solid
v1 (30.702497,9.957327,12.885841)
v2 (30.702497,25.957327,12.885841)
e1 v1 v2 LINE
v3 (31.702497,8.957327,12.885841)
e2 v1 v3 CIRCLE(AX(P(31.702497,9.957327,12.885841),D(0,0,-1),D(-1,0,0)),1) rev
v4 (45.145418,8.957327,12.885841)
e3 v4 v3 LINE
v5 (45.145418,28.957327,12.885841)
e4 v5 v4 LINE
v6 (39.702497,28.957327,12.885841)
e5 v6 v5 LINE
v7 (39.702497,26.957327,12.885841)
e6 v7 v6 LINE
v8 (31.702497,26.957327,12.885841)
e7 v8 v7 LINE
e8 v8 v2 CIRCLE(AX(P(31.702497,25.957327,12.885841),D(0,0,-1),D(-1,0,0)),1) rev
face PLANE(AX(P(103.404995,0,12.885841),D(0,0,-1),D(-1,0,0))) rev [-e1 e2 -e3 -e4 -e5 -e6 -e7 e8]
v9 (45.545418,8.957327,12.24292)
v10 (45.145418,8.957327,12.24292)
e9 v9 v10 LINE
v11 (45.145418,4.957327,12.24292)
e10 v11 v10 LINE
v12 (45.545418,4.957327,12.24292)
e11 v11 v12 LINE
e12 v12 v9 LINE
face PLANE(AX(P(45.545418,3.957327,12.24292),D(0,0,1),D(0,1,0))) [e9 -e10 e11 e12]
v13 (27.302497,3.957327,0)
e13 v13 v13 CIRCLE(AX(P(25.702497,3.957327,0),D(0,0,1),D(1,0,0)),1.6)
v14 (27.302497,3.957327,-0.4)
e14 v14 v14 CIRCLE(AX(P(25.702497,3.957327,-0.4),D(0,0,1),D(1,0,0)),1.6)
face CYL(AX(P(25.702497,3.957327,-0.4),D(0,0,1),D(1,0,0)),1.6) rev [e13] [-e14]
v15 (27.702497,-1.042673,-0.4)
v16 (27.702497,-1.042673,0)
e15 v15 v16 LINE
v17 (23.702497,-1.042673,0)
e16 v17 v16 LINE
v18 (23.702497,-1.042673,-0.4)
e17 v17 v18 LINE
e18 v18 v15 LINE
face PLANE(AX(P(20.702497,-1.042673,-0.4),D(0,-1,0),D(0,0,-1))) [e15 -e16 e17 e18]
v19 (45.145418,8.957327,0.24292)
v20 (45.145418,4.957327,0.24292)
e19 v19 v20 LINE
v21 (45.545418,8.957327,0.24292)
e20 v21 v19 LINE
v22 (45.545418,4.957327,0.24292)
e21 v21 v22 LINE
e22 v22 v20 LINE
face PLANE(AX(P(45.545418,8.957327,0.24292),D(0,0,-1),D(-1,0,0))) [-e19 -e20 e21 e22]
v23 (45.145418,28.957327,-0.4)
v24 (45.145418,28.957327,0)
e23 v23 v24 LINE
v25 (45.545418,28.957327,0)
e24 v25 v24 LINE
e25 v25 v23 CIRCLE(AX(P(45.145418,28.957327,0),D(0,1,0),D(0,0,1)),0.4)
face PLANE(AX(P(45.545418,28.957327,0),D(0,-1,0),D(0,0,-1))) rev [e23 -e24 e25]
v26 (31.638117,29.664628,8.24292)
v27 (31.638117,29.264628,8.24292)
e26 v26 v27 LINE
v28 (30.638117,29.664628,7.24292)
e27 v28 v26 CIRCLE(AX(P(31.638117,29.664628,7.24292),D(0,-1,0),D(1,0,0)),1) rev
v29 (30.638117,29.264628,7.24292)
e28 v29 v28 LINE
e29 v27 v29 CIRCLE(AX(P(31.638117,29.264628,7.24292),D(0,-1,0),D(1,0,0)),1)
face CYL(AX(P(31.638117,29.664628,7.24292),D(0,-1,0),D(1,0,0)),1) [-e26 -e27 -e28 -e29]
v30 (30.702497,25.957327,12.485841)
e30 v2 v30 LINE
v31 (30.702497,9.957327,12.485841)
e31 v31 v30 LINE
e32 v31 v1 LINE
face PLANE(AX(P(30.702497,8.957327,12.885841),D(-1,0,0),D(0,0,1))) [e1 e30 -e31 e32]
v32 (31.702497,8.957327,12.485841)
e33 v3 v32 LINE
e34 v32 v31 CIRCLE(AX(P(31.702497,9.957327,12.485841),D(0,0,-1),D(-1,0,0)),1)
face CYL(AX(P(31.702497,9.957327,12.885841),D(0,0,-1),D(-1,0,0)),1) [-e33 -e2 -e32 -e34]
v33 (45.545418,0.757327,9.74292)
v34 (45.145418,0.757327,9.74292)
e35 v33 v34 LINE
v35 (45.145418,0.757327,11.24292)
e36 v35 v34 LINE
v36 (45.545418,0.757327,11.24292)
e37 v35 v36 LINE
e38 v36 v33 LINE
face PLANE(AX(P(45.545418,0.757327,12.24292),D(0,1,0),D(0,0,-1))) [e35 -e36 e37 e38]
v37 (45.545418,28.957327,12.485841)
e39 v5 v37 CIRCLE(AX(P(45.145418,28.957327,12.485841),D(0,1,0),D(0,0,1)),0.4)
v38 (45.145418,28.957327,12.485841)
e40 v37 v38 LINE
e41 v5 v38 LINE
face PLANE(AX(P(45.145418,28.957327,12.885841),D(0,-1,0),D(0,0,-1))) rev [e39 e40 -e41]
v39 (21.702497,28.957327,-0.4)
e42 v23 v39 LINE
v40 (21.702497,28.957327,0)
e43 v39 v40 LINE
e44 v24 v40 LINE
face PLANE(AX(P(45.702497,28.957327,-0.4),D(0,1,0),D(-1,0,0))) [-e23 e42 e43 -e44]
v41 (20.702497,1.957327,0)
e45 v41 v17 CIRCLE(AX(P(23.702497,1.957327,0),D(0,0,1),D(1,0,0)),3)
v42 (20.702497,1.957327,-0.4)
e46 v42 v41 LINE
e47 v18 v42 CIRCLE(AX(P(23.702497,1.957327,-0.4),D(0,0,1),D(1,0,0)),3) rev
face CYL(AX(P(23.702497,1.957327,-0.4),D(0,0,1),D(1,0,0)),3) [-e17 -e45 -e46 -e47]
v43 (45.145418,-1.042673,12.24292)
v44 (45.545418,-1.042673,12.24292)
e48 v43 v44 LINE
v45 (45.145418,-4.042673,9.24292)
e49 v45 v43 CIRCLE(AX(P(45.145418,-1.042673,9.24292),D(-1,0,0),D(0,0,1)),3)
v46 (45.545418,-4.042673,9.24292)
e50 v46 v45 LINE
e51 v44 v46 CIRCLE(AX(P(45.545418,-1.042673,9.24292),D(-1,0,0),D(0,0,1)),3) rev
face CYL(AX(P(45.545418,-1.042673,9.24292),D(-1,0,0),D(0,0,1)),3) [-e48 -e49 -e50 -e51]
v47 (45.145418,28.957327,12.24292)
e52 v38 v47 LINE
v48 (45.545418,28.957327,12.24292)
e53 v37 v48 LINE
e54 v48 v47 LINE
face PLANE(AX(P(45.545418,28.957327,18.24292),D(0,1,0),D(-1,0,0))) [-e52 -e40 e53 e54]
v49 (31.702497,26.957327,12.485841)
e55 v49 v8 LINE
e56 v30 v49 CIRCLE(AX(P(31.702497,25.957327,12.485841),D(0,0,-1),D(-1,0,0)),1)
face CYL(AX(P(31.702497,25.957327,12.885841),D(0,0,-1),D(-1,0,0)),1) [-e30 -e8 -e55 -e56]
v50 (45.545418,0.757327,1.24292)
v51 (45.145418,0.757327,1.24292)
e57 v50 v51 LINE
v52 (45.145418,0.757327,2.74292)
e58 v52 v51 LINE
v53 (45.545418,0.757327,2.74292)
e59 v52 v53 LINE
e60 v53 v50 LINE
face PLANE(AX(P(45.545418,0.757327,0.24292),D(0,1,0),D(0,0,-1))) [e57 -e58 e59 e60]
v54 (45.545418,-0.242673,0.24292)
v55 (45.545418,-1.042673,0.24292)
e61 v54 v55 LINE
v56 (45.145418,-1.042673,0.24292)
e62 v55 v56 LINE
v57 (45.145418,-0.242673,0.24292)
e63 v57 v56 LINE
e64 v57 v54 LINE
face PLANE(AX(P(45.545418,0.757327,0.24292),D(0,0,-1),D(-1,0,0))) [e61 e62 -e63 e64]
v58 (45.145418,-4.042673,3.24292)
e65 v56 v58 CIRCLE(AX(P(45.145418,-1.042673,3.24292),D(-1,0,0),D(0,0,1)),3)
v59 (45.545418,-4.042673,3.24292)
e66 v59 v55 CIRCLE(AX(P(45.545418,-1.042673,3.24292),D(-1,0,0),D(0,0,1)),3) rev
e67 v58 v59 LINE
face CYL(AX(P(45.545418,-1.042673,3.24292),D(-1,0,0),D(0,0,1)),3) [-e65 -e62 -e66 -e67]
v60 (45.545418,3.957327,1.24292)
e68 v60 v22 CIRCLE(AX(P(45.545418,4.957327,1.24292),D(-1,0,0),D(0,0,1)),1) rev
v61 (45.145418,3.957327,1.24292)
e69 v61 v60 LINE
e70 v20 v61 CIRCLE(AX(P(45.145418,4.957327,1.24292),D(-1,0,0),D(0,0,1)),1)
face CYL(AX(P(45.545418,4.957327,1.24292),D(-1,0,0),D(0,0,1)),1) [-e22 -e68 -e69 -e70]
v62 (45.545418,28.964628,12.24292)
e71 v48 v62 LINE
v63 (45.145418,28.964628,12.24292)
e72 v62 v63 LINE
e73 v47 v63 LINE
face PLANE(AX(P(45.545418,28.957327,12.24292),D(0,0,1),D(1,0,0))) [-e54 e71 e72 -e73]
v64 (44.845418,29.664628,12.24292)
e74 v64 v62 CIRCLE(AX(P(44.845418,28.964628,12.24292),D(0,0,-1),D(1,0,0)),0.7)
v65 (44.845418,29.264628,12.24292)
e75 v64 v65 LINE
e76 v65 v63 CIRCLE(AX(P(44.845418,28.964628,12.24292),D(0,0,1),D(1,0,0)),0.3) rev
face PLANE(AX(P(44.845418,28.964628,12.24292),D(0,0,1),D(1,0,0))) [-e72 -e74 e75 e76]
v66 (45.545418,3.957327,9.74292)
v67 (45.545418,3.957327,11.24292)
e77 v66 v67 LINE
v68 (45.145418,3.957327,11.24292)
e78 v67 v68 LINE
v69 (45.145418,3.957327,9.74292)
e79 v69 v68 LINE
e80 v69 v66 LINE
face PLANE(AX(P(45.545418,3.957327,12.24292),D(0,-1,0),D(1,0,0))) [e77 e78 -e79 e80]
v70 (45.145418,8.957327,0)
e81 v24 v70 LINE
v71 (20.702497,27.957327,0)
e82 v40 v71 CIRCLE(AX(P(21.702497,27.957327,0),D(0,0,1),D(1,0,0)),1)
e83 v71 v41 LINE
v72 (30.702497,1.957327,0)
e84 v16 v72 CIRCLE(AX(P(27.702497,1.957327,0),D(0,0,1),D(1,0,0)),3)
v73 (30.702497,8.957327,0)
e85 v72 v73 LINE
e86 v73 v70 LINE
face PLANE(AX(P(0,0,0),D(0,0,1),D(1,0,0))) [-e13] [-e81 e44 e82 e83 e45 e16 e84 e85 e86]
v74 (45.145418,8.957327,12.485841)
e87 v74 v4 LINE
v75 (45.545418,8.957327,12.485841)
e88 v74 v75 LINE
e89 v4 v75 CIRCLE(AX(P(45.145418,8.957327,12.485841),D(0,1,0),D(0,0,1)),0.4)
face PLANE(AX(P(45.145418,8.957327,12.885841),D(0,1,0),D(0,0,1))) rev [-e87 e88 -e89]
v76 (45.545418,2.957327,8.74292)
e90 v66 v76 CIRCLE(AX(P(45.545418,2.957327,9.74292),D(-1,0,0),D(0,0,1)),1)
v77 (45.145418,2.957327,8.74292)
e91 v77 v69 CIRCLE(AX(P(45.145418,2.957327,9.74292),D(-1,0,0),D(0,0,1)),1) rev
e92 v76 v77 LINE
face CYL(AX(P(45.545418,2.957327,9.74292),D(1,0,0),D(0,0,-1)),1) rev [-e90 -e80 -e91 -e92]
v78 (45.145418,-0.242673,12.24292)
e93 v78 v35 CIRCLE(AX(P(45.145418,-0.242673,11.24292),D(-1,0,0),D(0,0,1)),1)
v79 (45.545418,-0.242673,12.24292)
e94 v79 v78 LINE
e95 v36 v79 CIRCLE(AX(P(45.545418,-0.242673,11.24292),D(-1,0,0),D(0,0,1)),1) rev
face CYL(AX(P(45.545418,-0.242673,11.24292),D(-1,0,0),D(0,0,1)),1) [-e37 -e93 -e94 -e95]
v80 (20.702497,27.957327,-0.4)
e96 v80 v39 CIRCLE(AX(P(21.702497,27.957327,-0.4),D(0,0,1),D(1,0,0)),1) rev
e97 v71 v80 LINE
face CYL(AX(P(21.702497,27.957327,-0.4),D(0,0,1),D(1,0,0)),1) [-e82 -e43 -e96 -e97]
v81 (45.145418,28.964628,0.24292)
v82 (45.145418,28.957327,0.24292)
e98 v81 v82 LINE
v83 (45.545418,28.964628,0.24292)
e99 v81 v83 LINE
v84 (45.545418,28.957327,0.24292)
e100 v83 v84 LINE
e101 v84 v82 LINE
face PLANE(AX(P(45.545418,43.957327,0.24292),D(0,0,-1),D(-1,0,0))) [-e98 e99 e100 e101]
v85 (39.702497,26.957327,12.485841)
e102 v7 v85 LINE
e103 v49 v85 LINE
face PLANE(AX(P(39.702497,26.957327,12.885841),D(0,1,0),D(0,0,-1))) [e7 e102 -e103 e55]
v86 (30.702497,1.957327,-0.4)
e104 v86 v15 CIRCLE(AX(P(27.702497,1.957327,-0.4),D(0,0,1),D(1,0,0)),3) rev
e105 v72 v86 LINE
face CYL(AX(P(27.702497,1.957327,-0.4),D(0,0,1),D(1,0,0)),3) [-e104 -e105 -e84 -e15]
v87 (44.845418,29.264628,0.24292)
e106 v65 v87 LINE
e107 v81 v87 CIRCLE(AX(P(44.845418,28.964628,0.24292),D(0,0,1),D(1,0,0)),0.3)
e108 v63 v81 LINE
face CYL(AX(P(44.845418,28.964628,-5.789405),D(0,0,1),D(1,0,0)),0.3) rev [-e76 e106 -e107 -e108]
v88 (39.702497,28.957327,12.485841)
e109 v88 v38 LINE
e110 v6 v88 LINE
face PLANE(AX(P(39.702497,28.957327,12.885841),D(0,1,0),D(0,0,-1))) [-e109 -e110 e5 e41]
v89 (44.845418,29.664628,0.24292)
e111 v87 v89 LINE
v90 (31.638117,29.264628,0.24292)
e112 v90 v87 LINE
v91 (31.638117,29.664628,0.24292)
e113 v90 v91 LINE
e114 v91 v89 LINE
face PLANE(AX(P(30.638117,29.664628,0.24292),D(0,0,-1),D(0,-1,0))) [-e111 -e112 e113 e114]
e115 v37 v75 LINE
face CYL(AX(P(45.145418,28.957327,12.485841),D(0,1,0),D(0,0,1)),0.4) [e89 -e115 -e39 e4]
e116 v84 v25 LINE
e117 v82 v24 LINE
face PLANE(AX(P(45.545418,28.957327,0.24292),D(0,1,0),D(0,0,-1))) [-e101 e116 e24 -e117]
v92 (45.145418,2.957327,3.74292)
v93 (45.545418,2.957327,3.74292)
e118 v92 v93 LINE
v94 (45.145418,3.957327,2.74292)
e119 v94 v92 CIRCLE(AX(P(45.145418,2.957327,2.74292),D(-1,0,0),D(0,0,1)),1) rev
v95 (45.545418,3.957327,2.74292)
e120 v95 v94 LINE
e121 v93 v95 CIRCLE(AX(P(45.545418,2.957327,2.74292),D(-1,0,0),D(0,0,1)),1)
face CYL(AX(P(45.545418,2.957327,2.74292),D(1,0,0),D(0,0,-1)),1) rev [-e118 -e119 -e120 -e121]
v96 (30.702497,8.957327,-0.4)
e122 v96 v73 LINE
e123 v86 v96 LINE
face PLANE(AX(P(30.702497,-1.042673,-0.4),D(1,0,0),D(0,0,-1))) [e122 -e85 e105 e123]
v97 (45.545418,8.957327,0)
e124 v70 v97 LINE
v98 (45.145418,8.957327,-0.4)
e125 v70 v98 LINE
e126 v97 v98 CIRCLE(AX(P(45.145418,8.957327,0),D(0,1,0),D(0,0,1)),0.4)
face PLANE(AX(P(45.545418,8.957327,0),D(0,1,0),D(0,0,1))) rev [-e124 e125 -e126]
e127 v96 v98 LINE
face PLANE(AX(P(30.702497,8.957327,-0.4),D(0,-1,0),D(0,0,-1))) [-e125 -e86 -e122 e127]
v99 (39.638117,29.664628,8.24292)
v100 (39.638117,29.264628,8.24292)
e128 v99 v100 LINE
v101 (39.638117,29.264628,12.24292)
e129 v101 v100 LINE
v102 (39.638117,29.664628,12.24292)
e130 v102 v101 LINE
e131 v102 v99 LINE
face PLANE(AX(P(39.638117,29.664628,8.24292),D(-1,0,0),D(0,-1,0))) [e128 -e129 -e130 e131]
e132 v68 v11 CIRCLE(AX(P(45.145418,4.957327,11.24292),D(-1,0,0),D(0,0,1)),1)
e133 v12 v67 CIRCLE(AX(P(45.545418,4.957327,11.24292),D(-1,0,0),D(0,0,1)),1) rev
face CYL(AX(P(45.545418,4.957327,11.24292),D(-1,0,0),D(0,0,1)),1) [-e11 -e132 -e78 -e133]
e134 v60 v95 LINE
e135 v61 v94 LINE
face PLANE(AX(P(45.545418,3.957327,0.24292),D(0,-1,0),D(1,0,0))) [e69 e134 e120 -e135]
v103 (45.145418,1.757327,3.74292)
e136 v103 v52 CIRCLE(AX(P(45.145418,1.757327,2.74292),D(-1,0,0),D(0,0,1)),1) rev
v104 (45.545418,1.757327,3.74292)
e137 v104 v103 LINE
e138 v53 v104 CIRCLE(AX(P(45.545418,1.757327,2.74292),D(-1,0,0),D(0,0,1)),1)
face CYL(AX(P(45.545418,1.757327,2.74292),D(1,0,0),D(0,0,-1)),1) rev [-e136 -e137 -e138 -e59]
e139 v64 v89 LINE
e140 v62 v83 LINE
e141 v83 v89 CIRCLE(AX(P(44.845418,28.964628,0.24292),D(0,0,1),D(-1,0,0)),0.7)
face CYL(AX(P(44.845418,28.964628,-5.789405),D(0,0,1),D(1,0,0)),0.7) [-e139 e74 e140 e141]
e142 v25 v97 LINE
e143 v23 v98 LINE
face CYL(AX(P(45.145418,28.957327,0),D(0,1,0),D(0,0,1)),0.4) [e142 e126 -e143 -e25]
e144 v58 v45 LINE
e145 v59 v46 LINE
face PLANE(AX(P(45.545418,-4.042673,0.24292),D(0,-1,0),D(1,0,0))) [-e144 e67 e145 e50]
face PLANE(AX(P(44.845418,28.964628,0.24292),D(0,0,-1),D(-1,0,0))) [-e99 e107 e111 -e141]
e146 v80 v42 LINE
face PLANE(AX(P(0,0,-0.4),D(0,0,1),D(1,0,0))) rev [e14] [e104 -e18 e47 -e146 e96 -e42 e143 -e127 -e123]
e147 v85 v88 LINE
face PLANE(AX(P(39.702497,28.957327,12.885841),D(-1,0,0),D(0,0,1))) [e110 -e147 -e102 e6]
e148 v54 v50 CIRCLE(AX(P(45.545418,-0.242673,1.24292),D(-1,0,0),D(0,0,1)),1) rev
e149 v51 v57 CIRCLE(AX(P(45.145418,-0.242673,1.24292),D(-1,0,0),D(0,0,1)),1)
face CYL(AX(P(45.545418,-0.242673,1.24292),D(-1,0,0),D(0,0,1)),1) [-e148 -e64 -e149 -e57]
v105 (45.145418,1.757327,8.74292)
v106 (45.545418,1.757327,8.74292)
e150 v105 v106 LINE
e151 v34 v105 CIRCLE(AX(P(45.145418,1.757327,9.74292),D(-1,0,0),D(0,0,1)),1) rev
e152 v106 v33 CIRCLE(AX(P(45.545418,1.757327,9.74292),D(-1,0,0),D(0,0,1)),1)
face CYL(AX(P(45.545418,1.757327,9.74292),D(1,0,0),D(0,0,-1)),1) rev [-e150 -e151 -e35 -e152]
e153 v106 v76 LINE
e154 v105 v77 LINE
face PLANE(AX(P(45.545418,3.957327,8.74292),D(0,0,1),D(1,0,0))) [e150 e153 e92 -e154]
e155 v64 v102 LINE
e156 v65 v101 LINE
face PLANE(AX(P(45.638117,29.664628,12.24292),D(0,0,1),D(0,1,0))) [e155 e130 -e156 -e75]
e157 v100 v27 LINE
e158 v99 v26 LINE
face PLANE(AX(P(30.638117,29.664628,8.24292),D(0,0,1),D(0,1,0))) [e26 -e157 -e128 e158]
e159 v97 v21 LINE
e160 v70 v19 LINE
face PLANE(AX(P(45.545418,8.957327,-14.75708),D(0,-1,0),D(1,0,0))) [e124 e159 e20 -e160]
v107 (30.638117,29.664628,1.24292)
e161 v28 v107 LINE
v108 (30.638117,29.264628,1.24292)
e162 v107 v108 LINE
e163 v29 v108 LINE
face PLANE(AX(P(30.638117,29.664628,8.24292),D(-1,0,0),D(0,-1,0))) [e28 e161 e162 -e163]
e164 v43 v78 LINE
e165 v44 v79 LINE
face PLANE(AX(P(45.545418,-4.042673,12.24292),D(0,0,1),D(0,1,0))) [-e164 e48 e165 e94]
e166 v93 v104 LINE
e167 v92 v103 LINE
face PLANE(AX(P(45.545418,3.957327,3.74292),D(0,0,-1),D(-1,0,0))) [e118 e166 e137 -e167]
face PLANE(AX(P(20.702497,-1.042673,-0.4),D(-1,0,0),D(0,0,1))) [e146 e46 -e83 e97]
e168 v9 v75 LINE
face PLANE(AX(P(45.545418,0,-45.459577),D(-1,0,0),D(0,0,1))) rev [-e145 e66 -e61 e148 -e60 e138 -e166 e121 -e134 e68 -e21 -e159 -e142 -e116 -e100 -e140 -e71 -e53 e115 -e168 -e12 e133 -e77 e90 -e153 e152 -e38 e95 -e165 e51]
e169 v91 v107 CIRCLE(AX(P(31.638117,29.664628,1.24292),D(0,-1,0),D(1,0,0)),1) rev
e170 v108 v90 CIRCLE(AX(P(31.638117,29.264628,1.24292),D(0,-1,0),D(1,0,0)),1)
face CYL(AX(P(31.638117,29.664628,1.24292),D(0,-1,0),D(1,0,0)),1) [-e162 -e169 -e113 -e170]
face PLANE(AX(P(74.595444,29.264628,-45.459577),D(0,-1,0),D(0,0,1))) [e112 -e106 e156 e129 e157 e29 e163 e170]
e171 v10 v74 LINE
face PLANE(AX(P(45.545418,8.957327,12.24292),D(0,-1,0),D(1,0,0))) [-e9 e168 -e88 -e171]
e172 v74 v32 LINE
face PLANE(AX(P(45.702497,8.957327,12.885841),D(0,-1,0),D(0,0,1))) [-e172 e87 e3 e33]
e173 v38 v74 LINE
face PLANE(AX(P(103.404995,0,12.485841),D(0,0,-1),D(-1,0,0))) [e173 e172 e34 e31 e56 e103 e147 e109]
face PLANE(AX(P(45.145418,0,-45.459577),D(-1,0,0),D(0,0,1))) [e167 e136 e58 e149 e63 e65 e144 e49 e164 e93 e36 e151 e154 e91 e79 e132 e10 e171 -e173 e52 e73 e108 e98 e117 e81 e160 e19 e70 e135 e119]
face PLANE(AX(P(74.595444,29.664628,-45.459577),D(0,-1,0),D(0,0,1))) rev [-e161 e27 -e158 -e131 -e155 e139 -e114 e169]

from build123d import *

# Parameters (mm, degrees)
SKETCH1_R                   = 1.6
BASE_FLANGE1_DEPTH          = 0.4
SKETCHED_START              = 45.702497433
SKETCHED_BEND8_DEPTH        = 12
SKETCHED_BEND8_2_DEPTH      = 8
SKETCHED_START_2            = 53.702497433
SKETCHED_BEND8_3_DEPTH      = 4
SKETCHED_START_3            = -0.4
SKETCHED_BEND12_OUTLINE_W   = 12
SKETCHED_BEND12_OUTLINE_H   = 0.4
SKETCHED_BEND12_DEPTH       = 14.907300918
SKETCHED_START_4            = 0.242920367
SKETCHED_BEND12_2_OUTLINE_W = 0.4
SKETCHED_BEND12_2_OUTLINE_H = 4.8
SKETCHED_BEND12_2_DEPTH     = 12
SKETCHED_START_5            = 12.485840735
SKETCHED_BEND12_3_DEPTH     = 0.4
SKETCHED_BEND12_4_OUTLINE_W = 9
SKETCHED_BEND12_4_OUTLINE_H = 0.4
SKETCHED_BEND12_4_DEPTH     = 8
SKETCHED_START_6            = 3.742920367
SKETCHED_BEND12_5_OUTLINE_W = 0.4
SKETCHED_BEND12_5_OUTLINE_H = 3.2
SKETCHED_BEND12_5_DEPTH     = 5
SKETCHED_BEND12_6_OUTLINE_W = 0.4
SKETCHED_BEND12_6_OUTLINE_H = 20
SKETCHED_BEND12_6_DEPTH     = 12.485840735
SKETCHED_START_7            = -4.042672779
SKETCHED_BEND12_7_DEPTH     = 33.307300919
SKETCHED_START_8            = 8.957327221
SKETCHED_BEND12_8_DEPTH     = 20
FILLET1_R                   = 3
FILLET2_R                   = 1
FILLET3_R                   = 1


with BuildPart() as part:
    # Base-Flange1: sheet metal written as solids
    # Sketch1 → Base-Flange1 (new body)
    with BuildSketch(Plane.XY):
        Polygon((30.702497433, -1.042672779), (30.702497433, 8.957327221), (45.702497433, 8.957327221), (45.702497433, 3.957327221), (49.202497433, 3.957327221), (49.202497433, 0.757327221), (45.702497433, 0.757327221), (45.702497433, -4.042672779), (57.702497433, -4.042672779), (57.702497433, 0.757327221), (54.202497433, 0.757327221), (54.202497433, 3.957327221), (57.702497433, 3.957327221), (57.702497433, 8.957327221), (72.702497433, 8.957327221), (72.702497433, 26.957327221), (63.702497433, 26.957327221), (63.702497433, 28.957327221), (57.702497433, 28.957327221), (57.702497433, 34.957327221), (53.702497433, 34.957327221), (53.702497433, 43.957327221), (45.702497433, 43.957327221), (45.702497433, 28.957327221), (20.702497433, 28.957327221), (20.702497433, -1.042672779), align=None)
        with Locations((25.702497433, 3.957327221)):
            Circle(SKETCH1_R, mode=Mode.SUBTRACT)
    extrude(amount=-BASE_FLANGE1_DEPTH)

    # Sketched Bend8: read off the stored shape, not the designer's step
    # Sketched Bend8 outline → Sketched Bend8 (cut)
    with BuildSketch(Plane.YZ.offset(SKETCHED_START)):
        with BuildLine():
            ThreePointArc((29.597083672, 0), (29.338793878, -0.291607978), (28.96462814, -0.4))
            Line((28.96462814, -0.4), (43.957327221, -0.4))
            Line((43.957327221, -0.4), (43.957327221, 0))
            Line((43.957327221, 0), (29.597083672, 0))
        make_face()
    extrude(amount=SKETCHED_BEND8_DEPTH, mode=Mode.SUBTRACT)

    # Sketched Bend8 2 outline → Sketched Bend8 2 (add)
    with BuildSketch(Plane.YZ.offset(SKETCHED_START)):
        with BuildLine():
            Line((29.66462814, 14.507300918), (29.26462814, 14.507300918))
            Line((29.26462814, 14.507300918), (29.26462814, 0.3))
            ThreePointArc((29.26462814, 0.3), (29.176760174, 0.087867966), (28.96462814, 0))
            Line((28.96462814, 0), (29.597083672, 0))
            ThreePointArc((29.597083672, 0), (29.647533284, 0.146245118), (29.66462814, 0.3))
            Line((29.66462814, 0.3), (29.66462814, 14.507300918))
        make_face()
    extrude(amount=SKETCHED_BEND8_2_DEPTH)

    # Sketched Bend8 3 outline → Sketched Bend8 3 (add)
    with BuildSketch(Plane.YZ.offset(SKETCHED_START_2)):
        with BuildLine():
            Line((29.66462814, 0.3), (29.66462814, 5.507300918))
            Line((29.66462814, 5.507300918), (29.26462814, 5.507300918))
            Line((29.26462814, 5.507300918), (29.26462814, 0.3))
            ThreePointArc((29.26462814, 0.3), (29.176760174, 0.087867966), (28.96462814, 0))
            Line((28.96462814, 0), (29.597083672, 0))
            ThreePointArc((29.597083672, 0), (29.647533284, 0.146245118), (29.66462814, 0.3))
        make_face()
    extrude(amount=SKETCHED_BEND8_3_DEPTH)

    # Sketched Bend12: read off the stored shape, not the designer's step
    # Sketched Bend12 outline → Sketched Bend12 (cut)
    with BuildSketch(Plane.XY.offset(SKETCHED_START_3)):
        with Locations((51.702497433, 29.46462814)):
            Rectangle(SKETCHED_BEND12_OUTLINE_W, SKETCHED_BEND12_OUTLINE_H)
    extrude(amount=SKETCHED_BEND12_DEPTH, mode=Mode.SUBTRACT)



with BuildPart() as body_2:
    # Sketched Bend12 2 outline → Sketched Bend12 2 (new body)
    with BuildSketch(Plane.XY.offset(SKETCHED_START_4)):
        with BuildLine():
            ThreePointArc((45.545417801, 28.96462814), (45.340392547, 29.459602886), (44.845417801, 29.66462814))
            Line((44.845417801, 29.66462814), (39.638116882, 29.66462814))
            Line((39.638116882, 29.66462814), (39.638116882, 29.26462814))
            Line((39.638116882, 29.26462814), (44.845417801, 29.26462814))
            ThreePointArc((44.845417801, 29.26462814), (45.057549835, 29.176760174), (45.145417801, 28.96462814))
            Line((45.145417801, 28.96462814), (45.145417801, 3.957327221))
            Line((45.145417801, 3.957327221), (45.545417801, 3.957327221))
            Line((45.545417801, 3.957327221), (45.545417801, 28.96462814))
        make_face()
        with Locations((45.345417801, -1.642672779)):
            Rectangle(SKETCHED_BEND12_2_OUTLINE_W, SKETCHED_BEND12_2_OUTLINE_H)
    extrude(amount=SKETCHED_BEND12_2_DEPTH)

    # Sketched Bend12 4 outline → Sketched Bend12 4 (add)
    with BuildSketch(Plane.XY.offset(SKETCHED_START_4)):
        with Locations((35.138116882, 29.46462814)):
            Rectangle(SKETCHED_BEND12_4_OUTLINE_W, SKETCHED_BEND12_4_OUTLINE_H)
    extrude(amount=SKETCHED_BEND12_4_DEPTH)

    # Sketched Bend12 5 outline → Sketched Bend12 5 (add)
    with BuildSketch(Plane.XY.offset(SKETCHED_START_6)):
        with Locations((45.345417801, 2.357327221)):
            Rectangle(SKETCHED_BEND12_5_OUTLINE_W, SKETCHED_BEND12_5_OUTLINE_H)
    extrude(amount=SKETCHED_BEND12_5_DEPTH)


with BuildPart() as body_3:
    # Sketched Bend12 3 outline → Sketched Bend12 3 (new body)
    with BuildSketch(Plane.XY.offset(SKETCHED_START_5)):
        Polygon((45.145417801, 8.957327221), (45.145417801, 28.957327221), (39.702497433, 28.957327221), (39.702497433, 26.957327221), (30.702497433, 26.957327221), (30.702497433, 8.957327221), align=None)
    extrude(amount=SKETCHED_BEND12_3_DEPTH)


with BuildPart() as part_1:
    add(part.part)

    add(body_2.part)  # Sketched Bend12 6 merges body 2

    add(body_3.part)  # Sketched Bend12 6 merges body 3
    # Sketched Bend12 6 outline → Sketched Bend12 6 (add)
    with BuildSketch(Plane.XY):
        with Locations((45.345417801, 18.957327221)):
            Rectangle(SKETCHED_BEND12_6_OUTLINE_W, SKETCHED_BEND12_6_OUTLINE_H)
    extrude(amount=SKETCHED_BEND12_6_DEPTH)

    # Sketched Bend12 7 outline → Sketched Bend12 7 (cut)
    with BuildSketch(Plane(origin=(0, 0, 0), x_dir=(1, 0, 0), z_dir=(0, 1, 0)).offset(SKETCHED_START_7)):
        with BuildLine():
            ThreePointArc((45.145417801, 0.4), (45.428260513, 0.282842712), (45.545417801, 0))
            Line((45.545417801, 0), (45.702497433, 0))
            Line((45.702497433, 0), (45.702497433, -14))
            Line((45.702497433, -14), (57.702497433, -14))
            Line((57.702497433, -14), (57.702497433, 0))
            Line((57.702497433, 0), (72.702497433, 0))
            Line((72.702497433, 0), (72.702497433, 0.4))
            Line((72.702497433, 0.4), (45.145417801, 0.4))
        make_face()
    extrude(amount=SKETCHED_BEND12_7_DEPTH, mode=Mode.SUBTRACT)

    # Sketched Bend12 8 outline → Sketched Bend12 8 (add)
    with BuildSketch(Plane(origin=(0, 0, 0), x_dir=(1, 0, 0), z_dir=(0, 1, 0)).offset(SKETCHED_START_8)):
        with BuildLine():
            Line((45.145417801, -12.485840735), (45.145417801, -12.885840735))
            ThreePointArc((45.145417801, -12.885840735), (45.428260513, -12.768683447), (45.545417801, -12.485840735))
            Line((45.545417801, -12.485840735), (45.145417801, -12.485840735))
        make_face()
    extrude(amount=SKETCHED_BEND12_8_DEPTH)

    # Fillet1
    fillet1_edges = [part_1.edges().sort_by_distance(p)[0] for p in [
        (45.345417801, -4.042672779, 0.242920367),
        (45.345417801, -4.042672779, 12.242920367),
        (30.702497433, -1.042672779, -0.2),
        (20.702497433, -1.042672779, -0.2),
    ]]
    fillet(fillet1_edges, radius=FILLET1_R)

    # Fillet2
    fillet2_edges = [part_1.edges().sort_by_distance(p)[0] for p in [
        (20.702497433, 28.957327221, -0.2),
        (30.702497433, 26.957327221, 12.685840735),
        (30.702497433, 8.957327221, 12.685840735),
        (30.638116882, 29.46462814, 0.242920367),
        (30.638116882, 29.46462814, 8.242920367),
    ]]
    fillet(fillet2_edges, radius=FILLET2_R)

    # Fillet3
    fillet3_edges = [part_1.edges().sort_by_distance(p)[0] for p in [
        (45.345417801, 3.957327221, 0.242920367),
        (45.345417801, 3.957327221, 3.742920367),
        (45.345417801, 0.757327221, 3.742920367),
        (45.345417801, 0.757327221, 0.242920367),
        (45.345417801, 0.757327221, 12.242920367),
        (45.345417801, 0.757327221, 8.742920367),
        (45.345417801, 3.957327221, 8.742920367),
        (45.345417801, 3.957327221, 12.242920367),
    ]]
    fillet(fillet3_edges, radius=FILLET3_R)


solid = part_1.part
